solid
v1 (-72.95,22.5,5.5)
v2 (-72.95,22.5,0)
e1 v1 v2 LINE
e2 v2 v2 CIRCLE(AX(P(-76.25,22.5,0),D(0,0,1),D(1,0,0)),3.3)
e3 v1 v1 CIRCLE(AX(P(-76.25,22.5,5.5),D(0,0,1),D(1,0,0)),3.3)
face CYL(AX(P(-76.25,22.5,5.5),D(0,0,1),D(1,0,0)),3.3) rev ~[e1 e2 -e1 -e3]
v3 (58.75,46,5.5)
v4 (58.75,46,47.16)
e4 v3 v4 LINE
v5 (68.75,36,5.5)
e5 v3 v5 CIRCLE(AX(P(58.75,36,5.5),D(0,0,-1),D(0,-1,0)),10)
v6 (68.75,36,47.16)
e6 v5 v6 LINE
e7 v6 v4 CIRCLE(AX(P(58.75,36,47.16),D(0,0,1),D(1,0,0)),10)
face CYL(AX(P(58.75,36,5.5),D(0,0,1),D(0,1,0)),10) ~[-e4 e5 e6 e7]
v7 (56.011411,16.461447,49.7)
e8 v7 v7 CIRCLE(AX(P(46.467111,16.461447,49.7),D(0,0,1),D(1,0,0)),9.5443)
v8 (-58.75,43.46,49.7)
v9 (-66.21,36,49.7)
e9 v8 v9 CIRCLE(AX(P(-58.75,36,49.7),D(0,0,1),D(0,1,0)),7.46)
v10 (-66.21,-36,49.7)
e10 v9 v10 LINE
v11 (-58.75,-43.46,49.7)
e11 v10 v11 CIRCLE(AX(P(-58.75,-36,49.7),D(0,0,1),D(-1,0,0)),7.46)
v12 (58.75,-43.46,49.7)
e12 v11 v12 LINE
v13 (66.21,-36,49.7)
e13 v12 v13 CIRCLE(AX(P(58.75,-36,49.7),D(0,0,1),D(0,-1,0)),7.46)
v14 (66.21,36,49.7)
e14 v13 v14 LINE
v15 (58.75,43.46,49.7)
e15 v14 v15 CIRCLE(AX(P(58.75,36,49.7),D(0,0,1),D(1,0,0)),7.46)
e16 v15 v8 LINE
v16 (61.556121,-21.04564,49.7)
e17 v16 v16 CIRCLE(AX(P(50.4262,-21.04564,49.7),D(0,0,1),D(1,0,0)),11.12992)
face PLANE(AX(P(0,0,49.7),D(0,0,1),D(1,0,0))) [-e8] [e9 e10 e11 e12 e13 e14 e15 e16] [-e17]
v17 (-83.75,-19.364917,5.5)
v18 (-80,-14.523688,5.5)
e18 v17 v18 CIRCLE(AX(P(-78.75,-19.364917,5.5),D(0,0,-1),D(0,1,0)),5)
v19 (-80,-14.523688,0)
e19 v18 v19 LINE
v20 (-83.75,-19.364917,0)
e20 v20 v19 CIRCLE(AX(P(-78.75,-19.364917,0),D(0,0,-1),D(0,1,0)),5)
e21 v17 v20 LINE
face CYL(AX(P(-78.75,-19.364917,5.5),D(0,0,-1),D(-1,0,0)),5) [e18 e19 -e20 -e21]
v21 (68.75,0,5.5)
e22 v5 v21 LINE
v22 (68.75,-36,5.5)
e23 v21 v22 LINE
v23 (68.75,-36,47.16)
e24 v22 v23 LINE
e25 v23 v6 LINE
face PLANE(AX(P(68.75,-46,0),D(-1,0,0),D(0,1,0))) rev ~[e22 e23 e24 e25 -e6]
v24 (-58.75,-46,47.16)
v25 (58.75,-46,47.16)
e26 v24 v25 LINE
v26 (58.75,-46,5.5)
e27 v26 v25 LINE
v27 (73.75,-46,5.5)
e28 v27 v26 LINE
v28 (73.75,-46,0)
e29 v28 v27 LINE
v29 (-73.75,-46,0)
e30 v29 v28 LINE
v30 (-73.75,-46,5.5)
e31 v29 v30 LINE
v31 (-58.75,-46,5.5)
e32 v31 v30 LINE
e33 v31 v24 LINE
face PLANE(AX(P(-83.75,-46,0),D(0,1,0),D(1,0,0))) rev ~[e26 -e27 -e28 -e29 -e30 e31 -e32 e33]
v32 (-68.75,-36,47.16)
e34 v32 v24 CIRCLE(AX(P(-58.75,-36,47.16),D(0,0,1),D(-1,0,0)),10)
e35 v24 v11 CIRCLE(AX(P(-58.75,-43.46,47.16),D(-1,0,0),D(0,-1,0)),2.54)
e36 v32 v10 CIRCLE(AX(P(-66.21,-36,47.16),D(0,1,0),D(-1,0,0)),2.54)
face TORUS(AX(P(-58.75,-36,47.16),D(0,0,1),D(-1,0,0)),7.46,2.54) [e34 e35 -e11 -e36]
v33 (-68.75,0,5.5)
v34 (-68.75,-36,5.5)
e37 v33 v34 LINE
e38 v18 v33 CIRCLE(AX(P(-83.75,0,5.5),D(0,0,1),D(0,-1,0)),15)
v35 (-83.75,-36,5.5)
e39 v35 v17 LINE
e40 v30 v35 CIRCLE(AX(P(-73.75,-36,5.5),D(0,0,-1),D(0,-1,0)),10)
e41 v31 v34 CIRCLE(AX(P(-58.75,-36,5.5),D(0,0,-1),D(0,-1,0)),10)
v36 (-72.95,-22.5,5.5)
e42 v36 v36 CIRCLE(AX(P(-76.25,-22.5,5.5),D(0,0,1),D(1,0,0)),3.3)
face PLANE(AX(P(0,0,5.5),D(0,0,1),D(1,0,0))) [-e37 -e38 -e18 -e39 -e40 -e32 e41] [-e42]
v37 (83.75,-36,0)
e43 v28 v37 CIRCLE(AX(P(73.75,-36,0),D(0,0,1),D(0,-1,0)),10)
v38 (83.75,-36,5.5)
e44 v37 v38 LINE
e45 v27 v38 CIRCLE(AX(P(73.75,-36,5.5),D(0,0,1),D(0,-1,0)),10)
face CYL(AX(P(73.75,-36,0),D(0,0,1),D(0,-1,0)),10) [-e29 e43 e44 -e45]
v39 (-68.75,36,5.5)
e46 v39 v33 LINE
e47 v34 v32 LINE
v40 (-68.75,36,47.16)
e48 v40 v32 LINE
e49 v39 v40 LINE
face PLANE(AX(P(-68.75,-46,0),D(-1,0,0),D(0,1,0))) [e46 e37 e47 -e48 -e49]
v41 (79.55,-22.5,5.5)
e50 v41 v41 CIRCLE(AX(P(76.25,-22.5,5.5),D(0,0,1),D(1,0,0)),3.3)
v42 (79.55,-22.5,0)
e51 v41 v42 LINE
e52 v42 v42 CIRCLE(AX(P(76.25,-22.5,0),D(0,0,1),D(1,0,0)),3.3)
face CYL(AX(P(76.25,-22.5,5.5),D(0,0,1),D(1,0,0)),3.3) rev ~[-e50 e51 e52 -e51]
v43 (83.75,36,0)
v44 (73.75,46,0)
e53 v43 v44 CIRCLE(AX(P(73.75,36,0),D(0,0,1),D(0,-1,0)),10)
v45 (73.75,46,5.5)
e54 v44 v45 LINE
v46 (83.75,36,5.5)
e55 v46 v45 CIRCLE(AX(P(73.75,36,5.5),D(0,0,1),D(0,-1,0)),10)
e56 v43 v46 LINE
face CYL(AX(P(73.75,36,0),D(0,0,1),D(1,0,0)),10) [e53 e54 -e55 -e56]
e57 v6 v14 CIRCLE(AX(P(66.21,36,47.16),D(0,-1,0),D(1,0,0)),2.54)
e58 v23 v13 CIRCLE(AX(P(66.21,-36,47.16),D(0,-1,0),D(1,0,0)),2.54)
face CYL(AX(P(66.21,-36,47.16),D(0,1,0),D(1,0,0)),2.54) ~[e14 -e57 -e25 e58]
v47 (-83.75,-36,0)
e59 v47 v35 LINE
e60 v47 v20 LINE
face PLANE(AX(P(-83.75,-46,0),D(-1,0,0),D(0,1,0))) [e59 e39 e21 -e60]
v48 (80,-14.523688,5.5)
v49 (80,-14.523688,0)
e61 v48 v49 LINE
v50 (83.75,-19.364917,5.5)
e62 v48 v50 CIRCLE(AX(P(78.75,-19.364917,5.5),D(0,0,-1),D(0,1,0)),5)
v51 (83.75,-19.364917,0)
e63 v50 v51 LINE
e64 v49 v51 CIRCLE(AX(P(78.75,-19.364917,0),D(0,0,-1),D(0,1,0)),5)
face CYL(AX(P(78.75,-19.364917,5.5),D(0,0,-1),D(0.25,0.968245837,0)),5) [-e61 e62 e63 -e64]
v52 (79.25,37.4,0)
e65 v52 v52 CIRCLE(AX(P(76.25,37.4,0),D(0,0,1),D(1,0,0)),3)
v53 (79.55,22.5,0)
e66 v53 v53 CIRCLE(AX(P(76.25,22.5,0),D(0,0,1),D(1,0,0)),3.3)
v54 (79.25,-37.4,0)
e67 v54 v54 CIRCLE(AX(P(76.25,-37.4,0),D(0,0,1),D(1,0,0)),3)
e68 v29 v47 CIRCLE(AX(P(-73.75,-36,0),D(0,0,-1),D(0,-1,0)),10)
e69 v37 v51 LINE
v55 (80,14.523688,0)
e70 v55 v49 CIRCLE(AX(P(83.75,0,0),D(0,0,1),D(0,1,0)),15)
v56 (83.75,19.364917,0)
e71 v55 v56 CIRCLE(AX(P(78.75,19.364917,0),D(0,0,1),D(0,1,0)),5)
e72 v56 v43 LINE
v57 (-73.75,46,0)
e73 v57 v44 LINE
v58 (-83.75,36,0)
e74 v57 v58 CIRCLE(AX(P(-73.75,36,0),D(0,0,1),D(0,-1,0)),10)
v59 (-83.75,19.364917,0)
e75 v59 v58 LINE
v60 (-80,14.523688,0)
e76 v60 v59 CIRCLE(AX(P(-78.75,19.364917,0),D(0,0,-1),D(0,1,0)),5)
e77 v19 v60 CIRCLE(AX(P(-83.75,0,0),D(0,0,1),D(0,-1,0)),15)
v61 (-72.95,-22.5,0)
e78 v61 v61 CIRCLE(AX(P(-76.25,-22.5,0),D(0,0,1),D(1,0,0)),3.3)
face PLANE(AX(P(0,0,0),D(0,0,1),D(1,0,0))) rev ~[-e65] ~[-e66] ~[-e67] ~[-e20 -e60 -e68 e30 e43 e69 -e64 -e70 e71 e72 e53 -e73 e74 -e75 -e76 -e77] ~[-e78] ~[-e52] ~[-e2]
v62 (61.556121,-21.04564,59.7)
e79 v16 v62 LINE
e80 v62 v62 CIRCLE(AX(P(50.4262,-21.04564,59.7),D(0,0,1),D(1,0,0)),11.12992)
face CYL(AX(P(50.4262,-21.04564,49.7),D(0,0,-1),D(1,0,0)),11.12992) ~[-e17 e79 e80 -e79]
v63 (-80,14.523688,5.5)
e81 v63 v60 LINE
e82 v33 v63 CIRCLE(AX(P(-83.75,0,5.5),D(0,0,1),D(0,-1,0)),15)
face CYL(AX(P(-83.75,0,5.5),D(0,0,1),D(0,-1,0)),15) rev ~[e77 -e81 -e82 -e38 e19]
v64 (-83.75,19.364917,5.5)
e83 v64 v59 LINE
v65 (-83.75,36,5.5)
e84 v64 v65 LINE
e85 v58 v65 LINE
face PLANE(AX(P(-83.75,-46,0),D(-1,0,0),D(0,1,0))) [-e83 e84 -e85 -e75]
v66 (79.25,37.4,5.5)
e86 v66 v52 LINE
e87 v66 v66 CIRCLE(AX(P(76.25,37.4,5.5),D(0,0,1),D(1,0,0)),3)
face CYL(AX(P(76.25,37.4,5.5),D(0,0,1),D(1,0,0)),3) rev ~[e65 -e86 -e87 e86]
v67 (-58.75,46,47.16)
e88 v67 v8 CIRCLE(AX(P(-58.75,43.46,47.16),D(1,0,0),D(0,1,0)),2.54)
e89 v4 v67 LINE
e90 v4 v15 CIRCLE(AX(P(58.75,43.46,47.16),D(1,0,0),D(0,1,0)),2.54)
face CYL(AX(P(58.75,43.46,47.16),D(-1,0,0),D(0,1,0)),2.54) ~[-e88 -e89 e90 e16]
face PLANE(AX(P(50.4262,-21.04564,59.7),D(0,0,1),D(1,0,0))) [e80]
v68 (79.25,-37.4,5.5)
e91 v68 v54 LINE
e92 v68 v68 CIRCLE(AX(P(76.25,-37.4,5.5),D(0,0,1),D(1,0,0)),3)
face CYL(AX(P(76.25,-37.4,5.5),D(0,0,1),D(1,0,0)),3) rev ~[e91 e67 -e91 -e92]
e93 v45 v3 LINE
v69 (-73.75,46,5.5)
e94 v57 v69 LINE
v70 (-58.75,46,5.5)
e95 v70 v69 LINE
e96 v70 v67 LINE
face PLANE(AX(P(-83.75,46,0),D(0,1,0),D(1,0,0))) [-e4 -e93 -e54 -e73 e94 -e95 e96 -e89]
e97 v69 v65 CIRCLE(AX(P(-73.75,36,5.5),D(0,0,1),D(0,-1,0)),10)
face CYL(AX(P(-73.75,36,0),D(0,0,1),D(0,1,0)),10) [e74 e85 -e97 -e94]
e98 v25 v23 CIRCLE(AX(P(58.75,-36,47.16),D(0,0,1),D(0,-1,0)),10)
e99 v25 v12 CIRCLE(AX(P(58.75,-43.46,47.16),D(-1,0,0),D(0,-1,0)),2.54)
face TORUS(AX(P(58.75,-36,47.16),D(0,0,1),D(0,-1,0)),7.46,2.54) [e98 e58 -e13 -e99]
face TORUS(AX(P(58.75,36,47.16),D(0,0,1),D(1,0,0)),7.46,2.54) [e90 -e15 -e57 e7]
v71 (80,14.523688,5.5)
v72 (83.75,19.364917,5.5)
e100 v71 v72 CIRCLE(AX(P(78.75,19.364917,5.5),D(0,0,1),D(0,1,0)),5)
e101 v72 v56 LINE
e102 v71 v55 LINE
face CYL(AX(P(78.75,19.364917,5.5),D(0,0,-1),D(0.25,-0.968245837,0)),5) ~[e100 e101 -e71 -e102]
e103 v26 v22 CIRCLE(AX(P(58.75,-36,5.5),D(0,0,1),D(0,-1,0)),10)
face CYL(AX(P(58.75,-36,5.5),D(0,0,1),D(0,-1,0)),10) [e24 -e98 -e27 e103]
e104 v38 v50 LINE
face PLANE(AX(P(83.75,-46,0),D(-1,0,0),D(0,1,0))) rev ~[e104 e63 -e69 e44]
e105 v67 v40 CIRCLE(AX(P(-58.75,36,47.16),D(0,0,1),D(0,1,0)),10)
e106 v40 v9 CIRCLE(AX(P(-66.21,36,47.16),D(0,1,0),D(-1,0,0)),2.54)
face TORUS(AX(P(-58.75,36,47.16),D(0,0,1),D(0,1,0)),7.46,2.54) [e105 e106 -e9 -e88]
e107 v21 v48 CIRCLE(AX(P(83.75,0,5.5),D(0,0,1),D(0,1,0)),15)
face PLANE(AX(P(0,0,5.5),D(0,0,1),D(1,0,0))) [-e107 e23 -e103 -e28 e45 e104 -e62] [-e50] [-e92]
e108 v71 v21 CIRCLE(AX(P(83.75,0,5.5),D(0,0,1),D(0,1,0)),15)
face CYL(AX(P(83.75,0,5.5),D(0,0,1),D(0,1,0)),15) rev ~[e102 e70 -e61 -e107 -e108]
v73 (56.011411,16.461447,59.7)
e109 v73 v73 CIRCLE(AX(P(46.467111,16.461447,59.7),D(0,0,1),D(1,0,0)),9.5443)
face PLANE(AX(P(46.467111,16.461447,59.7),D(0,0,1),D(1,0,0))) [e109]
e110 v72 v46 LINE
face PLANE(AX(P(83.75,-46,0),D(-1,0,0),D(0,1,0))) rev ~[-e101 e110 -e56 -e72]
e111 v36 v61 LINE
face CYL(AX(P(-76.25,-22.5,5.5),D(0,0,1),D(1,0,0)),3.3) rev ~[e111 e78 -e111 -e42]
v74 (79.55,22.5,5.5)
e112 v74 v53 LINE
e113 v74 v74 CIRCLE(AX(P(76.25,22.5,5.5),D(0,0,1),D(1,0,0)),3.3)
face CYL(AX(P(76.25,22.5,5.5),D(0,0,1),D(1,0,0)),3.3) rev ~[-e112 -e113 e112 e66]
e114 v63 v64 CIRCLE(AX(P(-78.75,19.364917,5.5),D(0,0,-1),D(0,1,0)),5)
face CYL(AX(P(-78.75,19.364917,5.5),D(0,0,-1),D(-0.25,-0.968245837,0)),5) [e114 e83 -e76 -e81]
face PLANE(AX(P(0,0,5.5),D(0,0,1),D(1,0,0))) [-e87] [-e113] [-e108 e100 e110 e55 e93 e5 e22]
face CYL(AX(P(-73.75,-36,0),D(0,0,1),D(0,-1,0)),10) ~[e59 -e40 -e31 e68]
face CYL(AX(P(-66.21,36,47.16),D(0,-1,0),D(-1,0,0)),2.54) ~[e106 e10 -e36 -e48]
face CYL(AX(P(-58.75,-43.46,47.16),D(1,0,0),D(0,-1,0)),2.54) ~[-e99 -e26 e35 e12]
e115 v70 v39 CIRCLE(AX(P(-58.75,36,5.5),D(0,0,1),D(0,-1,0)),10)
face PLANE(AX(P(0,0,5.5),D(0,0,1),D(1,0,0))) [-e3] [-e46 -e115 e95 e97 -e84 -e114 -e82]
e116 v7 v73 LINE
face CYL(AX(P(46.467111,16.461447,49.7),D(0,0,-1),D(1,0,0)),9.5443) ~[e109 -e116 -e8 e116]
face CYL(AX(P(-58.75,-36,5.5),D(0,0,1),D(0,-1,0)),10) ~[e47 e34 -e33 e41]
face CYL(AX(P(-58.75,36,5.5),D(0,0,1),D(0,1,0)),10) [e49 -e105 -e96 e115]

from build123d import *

# Parameters (mm, degrees)
F0_W      = 167.5
F0_H      = 92
F1_DEPTH  = 5.5
F2_W      = 137.5
F2_H      = 92
F3_DEPTH  = 49.7
F4_R      = 10
F5_R      = 2.54
F6_R      = 3.3
F6_R_2    = 3
F7_DEPTH  = 5.5
F10_DEPTH = 5.5
F11_R     = 5
F12_R     = 11.129920483
F12_R_2   = 9.5443004054
F13_DEPTH = 10


# Not quite as in the source:
# - a feature names something its author has since deleted; it is built from what else it names


with BuildPart() as f1:
    # F0 (on Top) → F1 (new body)
    with BuildSketch(Plane.XY):
        Rectangle(F0_W, F0_H)
    extrude(amount=F1_DEPTH)

    # F2 (on Top) → F3 (join)
    with BuildSketch(Plane.XY):
        Rectangle(F2_W, F2_H)
    extrude(amount=F3_DEPTH)

    # F4
    f4_edges = [f1.edges().sort_by_distance(p)[0] for p in [
        (-83.75, -46, 2.75),
        (83.75, -46, 2.75),
        (83.75, 46, 2.75),
        (-83.75, 46, 2.75),
        (-68.75, 46, 27.6),
        (-68.75, -46, 27.6),
        (68.75, 46, 27.6),
        (68.75, -46, 27.6),
    ]]
    fillet(f4_edges, radius=F4_R)

    # F5
    f5_edges = [f1.edges().sort_by_distance(p)[0] for p in [
        (0, -46, 49.7),
        (0, 46, 49.7),
        (65.821068, -43.071068, 49.7),
        (68.75, 0, 49.7),
        (65.821068, 43.071068, 49.7),
        (-65.821068, -43.071068, 49.7),
        (-68.75, 0, 49.7),
        (-65.821068, 43.071068, 49.7),
    ]]
    fillet(f5_edges, radius=F5_R)

    # F6 (on face) → F7 (cut)
    with BuildSketch(Plane.XY.offset(5.5)):
        with Locations((-76.25, 22.5)):
            Circle(F6_R)
        with Locations((-76.25, -22.5)):
            Circle(F6_R)
        with Locations((76.25, -22.5)):
            Circle(F6_R)
        with Locations((76.25, 22.5)):
            Circle(F6_R)
        with Locations((76.25, 37.4)):
            Circle(F6_R_2)
        with Locations((76.25, -37.4)):
            Circle(F6_R_2)
    extrude(amount=-F7_DEPTH, mode=Mode.SUBTRACT)

    # F8 (on face) + F9 (on face) → F10 (cut)
    with BuildSketch(Plane.XY.offset(5.5)):
        with BuildLine():
            ThreePointArc((-83.75, -15), (-73.1433982822, -10.6066017178), (-68.75, 0))
            ThreePointArc((-68.75, 0), (-73.1433982822, 10.6066017178), (-83.75, 15))
            Line((-83.75, 15), (-83.75, -15))
        make_face()
    with BuildSketch(Plane.XY.offset(5.5)):
        with BuildLine():
            Line((83.75, -15), (83.75, 15))
            ThreePointArc((83.75, 15), (73.1433983426, 10.6066017782), (68.75, 1.709e-07))
            ThreePointArc((68.75, 1.709e-07), (73.1433982218, -10.6066016574), (83.75, -15))
        make_face()
    extrude(amount=-F10_DEPTH, mode=Mode.SUBTRACT)

    # F11
    f11_edges = [f1.edges().sort_by_distance(p)[0] for p in [
        (83.75, -15, 2.75),
        (-83.75, -15, 2.75),
        (-83.75, 15, 2.75),
        (83.75, 15, 2.75),
    ]]
    fillet(f11_edges, radius=F11_R)

    # F12 (on face) → F13 (join)
    with BuildSketch(Plane.XY.offset(49.7)):
        with Locations((50.4262000322, -21.045640111)):
            Circle(F12_R)
        with Locations((46.4671105146, 16.4614468813)):
            Circle(F12_R_2)
    extrude(amount=F13_DEPTH)


solid = f1.part
